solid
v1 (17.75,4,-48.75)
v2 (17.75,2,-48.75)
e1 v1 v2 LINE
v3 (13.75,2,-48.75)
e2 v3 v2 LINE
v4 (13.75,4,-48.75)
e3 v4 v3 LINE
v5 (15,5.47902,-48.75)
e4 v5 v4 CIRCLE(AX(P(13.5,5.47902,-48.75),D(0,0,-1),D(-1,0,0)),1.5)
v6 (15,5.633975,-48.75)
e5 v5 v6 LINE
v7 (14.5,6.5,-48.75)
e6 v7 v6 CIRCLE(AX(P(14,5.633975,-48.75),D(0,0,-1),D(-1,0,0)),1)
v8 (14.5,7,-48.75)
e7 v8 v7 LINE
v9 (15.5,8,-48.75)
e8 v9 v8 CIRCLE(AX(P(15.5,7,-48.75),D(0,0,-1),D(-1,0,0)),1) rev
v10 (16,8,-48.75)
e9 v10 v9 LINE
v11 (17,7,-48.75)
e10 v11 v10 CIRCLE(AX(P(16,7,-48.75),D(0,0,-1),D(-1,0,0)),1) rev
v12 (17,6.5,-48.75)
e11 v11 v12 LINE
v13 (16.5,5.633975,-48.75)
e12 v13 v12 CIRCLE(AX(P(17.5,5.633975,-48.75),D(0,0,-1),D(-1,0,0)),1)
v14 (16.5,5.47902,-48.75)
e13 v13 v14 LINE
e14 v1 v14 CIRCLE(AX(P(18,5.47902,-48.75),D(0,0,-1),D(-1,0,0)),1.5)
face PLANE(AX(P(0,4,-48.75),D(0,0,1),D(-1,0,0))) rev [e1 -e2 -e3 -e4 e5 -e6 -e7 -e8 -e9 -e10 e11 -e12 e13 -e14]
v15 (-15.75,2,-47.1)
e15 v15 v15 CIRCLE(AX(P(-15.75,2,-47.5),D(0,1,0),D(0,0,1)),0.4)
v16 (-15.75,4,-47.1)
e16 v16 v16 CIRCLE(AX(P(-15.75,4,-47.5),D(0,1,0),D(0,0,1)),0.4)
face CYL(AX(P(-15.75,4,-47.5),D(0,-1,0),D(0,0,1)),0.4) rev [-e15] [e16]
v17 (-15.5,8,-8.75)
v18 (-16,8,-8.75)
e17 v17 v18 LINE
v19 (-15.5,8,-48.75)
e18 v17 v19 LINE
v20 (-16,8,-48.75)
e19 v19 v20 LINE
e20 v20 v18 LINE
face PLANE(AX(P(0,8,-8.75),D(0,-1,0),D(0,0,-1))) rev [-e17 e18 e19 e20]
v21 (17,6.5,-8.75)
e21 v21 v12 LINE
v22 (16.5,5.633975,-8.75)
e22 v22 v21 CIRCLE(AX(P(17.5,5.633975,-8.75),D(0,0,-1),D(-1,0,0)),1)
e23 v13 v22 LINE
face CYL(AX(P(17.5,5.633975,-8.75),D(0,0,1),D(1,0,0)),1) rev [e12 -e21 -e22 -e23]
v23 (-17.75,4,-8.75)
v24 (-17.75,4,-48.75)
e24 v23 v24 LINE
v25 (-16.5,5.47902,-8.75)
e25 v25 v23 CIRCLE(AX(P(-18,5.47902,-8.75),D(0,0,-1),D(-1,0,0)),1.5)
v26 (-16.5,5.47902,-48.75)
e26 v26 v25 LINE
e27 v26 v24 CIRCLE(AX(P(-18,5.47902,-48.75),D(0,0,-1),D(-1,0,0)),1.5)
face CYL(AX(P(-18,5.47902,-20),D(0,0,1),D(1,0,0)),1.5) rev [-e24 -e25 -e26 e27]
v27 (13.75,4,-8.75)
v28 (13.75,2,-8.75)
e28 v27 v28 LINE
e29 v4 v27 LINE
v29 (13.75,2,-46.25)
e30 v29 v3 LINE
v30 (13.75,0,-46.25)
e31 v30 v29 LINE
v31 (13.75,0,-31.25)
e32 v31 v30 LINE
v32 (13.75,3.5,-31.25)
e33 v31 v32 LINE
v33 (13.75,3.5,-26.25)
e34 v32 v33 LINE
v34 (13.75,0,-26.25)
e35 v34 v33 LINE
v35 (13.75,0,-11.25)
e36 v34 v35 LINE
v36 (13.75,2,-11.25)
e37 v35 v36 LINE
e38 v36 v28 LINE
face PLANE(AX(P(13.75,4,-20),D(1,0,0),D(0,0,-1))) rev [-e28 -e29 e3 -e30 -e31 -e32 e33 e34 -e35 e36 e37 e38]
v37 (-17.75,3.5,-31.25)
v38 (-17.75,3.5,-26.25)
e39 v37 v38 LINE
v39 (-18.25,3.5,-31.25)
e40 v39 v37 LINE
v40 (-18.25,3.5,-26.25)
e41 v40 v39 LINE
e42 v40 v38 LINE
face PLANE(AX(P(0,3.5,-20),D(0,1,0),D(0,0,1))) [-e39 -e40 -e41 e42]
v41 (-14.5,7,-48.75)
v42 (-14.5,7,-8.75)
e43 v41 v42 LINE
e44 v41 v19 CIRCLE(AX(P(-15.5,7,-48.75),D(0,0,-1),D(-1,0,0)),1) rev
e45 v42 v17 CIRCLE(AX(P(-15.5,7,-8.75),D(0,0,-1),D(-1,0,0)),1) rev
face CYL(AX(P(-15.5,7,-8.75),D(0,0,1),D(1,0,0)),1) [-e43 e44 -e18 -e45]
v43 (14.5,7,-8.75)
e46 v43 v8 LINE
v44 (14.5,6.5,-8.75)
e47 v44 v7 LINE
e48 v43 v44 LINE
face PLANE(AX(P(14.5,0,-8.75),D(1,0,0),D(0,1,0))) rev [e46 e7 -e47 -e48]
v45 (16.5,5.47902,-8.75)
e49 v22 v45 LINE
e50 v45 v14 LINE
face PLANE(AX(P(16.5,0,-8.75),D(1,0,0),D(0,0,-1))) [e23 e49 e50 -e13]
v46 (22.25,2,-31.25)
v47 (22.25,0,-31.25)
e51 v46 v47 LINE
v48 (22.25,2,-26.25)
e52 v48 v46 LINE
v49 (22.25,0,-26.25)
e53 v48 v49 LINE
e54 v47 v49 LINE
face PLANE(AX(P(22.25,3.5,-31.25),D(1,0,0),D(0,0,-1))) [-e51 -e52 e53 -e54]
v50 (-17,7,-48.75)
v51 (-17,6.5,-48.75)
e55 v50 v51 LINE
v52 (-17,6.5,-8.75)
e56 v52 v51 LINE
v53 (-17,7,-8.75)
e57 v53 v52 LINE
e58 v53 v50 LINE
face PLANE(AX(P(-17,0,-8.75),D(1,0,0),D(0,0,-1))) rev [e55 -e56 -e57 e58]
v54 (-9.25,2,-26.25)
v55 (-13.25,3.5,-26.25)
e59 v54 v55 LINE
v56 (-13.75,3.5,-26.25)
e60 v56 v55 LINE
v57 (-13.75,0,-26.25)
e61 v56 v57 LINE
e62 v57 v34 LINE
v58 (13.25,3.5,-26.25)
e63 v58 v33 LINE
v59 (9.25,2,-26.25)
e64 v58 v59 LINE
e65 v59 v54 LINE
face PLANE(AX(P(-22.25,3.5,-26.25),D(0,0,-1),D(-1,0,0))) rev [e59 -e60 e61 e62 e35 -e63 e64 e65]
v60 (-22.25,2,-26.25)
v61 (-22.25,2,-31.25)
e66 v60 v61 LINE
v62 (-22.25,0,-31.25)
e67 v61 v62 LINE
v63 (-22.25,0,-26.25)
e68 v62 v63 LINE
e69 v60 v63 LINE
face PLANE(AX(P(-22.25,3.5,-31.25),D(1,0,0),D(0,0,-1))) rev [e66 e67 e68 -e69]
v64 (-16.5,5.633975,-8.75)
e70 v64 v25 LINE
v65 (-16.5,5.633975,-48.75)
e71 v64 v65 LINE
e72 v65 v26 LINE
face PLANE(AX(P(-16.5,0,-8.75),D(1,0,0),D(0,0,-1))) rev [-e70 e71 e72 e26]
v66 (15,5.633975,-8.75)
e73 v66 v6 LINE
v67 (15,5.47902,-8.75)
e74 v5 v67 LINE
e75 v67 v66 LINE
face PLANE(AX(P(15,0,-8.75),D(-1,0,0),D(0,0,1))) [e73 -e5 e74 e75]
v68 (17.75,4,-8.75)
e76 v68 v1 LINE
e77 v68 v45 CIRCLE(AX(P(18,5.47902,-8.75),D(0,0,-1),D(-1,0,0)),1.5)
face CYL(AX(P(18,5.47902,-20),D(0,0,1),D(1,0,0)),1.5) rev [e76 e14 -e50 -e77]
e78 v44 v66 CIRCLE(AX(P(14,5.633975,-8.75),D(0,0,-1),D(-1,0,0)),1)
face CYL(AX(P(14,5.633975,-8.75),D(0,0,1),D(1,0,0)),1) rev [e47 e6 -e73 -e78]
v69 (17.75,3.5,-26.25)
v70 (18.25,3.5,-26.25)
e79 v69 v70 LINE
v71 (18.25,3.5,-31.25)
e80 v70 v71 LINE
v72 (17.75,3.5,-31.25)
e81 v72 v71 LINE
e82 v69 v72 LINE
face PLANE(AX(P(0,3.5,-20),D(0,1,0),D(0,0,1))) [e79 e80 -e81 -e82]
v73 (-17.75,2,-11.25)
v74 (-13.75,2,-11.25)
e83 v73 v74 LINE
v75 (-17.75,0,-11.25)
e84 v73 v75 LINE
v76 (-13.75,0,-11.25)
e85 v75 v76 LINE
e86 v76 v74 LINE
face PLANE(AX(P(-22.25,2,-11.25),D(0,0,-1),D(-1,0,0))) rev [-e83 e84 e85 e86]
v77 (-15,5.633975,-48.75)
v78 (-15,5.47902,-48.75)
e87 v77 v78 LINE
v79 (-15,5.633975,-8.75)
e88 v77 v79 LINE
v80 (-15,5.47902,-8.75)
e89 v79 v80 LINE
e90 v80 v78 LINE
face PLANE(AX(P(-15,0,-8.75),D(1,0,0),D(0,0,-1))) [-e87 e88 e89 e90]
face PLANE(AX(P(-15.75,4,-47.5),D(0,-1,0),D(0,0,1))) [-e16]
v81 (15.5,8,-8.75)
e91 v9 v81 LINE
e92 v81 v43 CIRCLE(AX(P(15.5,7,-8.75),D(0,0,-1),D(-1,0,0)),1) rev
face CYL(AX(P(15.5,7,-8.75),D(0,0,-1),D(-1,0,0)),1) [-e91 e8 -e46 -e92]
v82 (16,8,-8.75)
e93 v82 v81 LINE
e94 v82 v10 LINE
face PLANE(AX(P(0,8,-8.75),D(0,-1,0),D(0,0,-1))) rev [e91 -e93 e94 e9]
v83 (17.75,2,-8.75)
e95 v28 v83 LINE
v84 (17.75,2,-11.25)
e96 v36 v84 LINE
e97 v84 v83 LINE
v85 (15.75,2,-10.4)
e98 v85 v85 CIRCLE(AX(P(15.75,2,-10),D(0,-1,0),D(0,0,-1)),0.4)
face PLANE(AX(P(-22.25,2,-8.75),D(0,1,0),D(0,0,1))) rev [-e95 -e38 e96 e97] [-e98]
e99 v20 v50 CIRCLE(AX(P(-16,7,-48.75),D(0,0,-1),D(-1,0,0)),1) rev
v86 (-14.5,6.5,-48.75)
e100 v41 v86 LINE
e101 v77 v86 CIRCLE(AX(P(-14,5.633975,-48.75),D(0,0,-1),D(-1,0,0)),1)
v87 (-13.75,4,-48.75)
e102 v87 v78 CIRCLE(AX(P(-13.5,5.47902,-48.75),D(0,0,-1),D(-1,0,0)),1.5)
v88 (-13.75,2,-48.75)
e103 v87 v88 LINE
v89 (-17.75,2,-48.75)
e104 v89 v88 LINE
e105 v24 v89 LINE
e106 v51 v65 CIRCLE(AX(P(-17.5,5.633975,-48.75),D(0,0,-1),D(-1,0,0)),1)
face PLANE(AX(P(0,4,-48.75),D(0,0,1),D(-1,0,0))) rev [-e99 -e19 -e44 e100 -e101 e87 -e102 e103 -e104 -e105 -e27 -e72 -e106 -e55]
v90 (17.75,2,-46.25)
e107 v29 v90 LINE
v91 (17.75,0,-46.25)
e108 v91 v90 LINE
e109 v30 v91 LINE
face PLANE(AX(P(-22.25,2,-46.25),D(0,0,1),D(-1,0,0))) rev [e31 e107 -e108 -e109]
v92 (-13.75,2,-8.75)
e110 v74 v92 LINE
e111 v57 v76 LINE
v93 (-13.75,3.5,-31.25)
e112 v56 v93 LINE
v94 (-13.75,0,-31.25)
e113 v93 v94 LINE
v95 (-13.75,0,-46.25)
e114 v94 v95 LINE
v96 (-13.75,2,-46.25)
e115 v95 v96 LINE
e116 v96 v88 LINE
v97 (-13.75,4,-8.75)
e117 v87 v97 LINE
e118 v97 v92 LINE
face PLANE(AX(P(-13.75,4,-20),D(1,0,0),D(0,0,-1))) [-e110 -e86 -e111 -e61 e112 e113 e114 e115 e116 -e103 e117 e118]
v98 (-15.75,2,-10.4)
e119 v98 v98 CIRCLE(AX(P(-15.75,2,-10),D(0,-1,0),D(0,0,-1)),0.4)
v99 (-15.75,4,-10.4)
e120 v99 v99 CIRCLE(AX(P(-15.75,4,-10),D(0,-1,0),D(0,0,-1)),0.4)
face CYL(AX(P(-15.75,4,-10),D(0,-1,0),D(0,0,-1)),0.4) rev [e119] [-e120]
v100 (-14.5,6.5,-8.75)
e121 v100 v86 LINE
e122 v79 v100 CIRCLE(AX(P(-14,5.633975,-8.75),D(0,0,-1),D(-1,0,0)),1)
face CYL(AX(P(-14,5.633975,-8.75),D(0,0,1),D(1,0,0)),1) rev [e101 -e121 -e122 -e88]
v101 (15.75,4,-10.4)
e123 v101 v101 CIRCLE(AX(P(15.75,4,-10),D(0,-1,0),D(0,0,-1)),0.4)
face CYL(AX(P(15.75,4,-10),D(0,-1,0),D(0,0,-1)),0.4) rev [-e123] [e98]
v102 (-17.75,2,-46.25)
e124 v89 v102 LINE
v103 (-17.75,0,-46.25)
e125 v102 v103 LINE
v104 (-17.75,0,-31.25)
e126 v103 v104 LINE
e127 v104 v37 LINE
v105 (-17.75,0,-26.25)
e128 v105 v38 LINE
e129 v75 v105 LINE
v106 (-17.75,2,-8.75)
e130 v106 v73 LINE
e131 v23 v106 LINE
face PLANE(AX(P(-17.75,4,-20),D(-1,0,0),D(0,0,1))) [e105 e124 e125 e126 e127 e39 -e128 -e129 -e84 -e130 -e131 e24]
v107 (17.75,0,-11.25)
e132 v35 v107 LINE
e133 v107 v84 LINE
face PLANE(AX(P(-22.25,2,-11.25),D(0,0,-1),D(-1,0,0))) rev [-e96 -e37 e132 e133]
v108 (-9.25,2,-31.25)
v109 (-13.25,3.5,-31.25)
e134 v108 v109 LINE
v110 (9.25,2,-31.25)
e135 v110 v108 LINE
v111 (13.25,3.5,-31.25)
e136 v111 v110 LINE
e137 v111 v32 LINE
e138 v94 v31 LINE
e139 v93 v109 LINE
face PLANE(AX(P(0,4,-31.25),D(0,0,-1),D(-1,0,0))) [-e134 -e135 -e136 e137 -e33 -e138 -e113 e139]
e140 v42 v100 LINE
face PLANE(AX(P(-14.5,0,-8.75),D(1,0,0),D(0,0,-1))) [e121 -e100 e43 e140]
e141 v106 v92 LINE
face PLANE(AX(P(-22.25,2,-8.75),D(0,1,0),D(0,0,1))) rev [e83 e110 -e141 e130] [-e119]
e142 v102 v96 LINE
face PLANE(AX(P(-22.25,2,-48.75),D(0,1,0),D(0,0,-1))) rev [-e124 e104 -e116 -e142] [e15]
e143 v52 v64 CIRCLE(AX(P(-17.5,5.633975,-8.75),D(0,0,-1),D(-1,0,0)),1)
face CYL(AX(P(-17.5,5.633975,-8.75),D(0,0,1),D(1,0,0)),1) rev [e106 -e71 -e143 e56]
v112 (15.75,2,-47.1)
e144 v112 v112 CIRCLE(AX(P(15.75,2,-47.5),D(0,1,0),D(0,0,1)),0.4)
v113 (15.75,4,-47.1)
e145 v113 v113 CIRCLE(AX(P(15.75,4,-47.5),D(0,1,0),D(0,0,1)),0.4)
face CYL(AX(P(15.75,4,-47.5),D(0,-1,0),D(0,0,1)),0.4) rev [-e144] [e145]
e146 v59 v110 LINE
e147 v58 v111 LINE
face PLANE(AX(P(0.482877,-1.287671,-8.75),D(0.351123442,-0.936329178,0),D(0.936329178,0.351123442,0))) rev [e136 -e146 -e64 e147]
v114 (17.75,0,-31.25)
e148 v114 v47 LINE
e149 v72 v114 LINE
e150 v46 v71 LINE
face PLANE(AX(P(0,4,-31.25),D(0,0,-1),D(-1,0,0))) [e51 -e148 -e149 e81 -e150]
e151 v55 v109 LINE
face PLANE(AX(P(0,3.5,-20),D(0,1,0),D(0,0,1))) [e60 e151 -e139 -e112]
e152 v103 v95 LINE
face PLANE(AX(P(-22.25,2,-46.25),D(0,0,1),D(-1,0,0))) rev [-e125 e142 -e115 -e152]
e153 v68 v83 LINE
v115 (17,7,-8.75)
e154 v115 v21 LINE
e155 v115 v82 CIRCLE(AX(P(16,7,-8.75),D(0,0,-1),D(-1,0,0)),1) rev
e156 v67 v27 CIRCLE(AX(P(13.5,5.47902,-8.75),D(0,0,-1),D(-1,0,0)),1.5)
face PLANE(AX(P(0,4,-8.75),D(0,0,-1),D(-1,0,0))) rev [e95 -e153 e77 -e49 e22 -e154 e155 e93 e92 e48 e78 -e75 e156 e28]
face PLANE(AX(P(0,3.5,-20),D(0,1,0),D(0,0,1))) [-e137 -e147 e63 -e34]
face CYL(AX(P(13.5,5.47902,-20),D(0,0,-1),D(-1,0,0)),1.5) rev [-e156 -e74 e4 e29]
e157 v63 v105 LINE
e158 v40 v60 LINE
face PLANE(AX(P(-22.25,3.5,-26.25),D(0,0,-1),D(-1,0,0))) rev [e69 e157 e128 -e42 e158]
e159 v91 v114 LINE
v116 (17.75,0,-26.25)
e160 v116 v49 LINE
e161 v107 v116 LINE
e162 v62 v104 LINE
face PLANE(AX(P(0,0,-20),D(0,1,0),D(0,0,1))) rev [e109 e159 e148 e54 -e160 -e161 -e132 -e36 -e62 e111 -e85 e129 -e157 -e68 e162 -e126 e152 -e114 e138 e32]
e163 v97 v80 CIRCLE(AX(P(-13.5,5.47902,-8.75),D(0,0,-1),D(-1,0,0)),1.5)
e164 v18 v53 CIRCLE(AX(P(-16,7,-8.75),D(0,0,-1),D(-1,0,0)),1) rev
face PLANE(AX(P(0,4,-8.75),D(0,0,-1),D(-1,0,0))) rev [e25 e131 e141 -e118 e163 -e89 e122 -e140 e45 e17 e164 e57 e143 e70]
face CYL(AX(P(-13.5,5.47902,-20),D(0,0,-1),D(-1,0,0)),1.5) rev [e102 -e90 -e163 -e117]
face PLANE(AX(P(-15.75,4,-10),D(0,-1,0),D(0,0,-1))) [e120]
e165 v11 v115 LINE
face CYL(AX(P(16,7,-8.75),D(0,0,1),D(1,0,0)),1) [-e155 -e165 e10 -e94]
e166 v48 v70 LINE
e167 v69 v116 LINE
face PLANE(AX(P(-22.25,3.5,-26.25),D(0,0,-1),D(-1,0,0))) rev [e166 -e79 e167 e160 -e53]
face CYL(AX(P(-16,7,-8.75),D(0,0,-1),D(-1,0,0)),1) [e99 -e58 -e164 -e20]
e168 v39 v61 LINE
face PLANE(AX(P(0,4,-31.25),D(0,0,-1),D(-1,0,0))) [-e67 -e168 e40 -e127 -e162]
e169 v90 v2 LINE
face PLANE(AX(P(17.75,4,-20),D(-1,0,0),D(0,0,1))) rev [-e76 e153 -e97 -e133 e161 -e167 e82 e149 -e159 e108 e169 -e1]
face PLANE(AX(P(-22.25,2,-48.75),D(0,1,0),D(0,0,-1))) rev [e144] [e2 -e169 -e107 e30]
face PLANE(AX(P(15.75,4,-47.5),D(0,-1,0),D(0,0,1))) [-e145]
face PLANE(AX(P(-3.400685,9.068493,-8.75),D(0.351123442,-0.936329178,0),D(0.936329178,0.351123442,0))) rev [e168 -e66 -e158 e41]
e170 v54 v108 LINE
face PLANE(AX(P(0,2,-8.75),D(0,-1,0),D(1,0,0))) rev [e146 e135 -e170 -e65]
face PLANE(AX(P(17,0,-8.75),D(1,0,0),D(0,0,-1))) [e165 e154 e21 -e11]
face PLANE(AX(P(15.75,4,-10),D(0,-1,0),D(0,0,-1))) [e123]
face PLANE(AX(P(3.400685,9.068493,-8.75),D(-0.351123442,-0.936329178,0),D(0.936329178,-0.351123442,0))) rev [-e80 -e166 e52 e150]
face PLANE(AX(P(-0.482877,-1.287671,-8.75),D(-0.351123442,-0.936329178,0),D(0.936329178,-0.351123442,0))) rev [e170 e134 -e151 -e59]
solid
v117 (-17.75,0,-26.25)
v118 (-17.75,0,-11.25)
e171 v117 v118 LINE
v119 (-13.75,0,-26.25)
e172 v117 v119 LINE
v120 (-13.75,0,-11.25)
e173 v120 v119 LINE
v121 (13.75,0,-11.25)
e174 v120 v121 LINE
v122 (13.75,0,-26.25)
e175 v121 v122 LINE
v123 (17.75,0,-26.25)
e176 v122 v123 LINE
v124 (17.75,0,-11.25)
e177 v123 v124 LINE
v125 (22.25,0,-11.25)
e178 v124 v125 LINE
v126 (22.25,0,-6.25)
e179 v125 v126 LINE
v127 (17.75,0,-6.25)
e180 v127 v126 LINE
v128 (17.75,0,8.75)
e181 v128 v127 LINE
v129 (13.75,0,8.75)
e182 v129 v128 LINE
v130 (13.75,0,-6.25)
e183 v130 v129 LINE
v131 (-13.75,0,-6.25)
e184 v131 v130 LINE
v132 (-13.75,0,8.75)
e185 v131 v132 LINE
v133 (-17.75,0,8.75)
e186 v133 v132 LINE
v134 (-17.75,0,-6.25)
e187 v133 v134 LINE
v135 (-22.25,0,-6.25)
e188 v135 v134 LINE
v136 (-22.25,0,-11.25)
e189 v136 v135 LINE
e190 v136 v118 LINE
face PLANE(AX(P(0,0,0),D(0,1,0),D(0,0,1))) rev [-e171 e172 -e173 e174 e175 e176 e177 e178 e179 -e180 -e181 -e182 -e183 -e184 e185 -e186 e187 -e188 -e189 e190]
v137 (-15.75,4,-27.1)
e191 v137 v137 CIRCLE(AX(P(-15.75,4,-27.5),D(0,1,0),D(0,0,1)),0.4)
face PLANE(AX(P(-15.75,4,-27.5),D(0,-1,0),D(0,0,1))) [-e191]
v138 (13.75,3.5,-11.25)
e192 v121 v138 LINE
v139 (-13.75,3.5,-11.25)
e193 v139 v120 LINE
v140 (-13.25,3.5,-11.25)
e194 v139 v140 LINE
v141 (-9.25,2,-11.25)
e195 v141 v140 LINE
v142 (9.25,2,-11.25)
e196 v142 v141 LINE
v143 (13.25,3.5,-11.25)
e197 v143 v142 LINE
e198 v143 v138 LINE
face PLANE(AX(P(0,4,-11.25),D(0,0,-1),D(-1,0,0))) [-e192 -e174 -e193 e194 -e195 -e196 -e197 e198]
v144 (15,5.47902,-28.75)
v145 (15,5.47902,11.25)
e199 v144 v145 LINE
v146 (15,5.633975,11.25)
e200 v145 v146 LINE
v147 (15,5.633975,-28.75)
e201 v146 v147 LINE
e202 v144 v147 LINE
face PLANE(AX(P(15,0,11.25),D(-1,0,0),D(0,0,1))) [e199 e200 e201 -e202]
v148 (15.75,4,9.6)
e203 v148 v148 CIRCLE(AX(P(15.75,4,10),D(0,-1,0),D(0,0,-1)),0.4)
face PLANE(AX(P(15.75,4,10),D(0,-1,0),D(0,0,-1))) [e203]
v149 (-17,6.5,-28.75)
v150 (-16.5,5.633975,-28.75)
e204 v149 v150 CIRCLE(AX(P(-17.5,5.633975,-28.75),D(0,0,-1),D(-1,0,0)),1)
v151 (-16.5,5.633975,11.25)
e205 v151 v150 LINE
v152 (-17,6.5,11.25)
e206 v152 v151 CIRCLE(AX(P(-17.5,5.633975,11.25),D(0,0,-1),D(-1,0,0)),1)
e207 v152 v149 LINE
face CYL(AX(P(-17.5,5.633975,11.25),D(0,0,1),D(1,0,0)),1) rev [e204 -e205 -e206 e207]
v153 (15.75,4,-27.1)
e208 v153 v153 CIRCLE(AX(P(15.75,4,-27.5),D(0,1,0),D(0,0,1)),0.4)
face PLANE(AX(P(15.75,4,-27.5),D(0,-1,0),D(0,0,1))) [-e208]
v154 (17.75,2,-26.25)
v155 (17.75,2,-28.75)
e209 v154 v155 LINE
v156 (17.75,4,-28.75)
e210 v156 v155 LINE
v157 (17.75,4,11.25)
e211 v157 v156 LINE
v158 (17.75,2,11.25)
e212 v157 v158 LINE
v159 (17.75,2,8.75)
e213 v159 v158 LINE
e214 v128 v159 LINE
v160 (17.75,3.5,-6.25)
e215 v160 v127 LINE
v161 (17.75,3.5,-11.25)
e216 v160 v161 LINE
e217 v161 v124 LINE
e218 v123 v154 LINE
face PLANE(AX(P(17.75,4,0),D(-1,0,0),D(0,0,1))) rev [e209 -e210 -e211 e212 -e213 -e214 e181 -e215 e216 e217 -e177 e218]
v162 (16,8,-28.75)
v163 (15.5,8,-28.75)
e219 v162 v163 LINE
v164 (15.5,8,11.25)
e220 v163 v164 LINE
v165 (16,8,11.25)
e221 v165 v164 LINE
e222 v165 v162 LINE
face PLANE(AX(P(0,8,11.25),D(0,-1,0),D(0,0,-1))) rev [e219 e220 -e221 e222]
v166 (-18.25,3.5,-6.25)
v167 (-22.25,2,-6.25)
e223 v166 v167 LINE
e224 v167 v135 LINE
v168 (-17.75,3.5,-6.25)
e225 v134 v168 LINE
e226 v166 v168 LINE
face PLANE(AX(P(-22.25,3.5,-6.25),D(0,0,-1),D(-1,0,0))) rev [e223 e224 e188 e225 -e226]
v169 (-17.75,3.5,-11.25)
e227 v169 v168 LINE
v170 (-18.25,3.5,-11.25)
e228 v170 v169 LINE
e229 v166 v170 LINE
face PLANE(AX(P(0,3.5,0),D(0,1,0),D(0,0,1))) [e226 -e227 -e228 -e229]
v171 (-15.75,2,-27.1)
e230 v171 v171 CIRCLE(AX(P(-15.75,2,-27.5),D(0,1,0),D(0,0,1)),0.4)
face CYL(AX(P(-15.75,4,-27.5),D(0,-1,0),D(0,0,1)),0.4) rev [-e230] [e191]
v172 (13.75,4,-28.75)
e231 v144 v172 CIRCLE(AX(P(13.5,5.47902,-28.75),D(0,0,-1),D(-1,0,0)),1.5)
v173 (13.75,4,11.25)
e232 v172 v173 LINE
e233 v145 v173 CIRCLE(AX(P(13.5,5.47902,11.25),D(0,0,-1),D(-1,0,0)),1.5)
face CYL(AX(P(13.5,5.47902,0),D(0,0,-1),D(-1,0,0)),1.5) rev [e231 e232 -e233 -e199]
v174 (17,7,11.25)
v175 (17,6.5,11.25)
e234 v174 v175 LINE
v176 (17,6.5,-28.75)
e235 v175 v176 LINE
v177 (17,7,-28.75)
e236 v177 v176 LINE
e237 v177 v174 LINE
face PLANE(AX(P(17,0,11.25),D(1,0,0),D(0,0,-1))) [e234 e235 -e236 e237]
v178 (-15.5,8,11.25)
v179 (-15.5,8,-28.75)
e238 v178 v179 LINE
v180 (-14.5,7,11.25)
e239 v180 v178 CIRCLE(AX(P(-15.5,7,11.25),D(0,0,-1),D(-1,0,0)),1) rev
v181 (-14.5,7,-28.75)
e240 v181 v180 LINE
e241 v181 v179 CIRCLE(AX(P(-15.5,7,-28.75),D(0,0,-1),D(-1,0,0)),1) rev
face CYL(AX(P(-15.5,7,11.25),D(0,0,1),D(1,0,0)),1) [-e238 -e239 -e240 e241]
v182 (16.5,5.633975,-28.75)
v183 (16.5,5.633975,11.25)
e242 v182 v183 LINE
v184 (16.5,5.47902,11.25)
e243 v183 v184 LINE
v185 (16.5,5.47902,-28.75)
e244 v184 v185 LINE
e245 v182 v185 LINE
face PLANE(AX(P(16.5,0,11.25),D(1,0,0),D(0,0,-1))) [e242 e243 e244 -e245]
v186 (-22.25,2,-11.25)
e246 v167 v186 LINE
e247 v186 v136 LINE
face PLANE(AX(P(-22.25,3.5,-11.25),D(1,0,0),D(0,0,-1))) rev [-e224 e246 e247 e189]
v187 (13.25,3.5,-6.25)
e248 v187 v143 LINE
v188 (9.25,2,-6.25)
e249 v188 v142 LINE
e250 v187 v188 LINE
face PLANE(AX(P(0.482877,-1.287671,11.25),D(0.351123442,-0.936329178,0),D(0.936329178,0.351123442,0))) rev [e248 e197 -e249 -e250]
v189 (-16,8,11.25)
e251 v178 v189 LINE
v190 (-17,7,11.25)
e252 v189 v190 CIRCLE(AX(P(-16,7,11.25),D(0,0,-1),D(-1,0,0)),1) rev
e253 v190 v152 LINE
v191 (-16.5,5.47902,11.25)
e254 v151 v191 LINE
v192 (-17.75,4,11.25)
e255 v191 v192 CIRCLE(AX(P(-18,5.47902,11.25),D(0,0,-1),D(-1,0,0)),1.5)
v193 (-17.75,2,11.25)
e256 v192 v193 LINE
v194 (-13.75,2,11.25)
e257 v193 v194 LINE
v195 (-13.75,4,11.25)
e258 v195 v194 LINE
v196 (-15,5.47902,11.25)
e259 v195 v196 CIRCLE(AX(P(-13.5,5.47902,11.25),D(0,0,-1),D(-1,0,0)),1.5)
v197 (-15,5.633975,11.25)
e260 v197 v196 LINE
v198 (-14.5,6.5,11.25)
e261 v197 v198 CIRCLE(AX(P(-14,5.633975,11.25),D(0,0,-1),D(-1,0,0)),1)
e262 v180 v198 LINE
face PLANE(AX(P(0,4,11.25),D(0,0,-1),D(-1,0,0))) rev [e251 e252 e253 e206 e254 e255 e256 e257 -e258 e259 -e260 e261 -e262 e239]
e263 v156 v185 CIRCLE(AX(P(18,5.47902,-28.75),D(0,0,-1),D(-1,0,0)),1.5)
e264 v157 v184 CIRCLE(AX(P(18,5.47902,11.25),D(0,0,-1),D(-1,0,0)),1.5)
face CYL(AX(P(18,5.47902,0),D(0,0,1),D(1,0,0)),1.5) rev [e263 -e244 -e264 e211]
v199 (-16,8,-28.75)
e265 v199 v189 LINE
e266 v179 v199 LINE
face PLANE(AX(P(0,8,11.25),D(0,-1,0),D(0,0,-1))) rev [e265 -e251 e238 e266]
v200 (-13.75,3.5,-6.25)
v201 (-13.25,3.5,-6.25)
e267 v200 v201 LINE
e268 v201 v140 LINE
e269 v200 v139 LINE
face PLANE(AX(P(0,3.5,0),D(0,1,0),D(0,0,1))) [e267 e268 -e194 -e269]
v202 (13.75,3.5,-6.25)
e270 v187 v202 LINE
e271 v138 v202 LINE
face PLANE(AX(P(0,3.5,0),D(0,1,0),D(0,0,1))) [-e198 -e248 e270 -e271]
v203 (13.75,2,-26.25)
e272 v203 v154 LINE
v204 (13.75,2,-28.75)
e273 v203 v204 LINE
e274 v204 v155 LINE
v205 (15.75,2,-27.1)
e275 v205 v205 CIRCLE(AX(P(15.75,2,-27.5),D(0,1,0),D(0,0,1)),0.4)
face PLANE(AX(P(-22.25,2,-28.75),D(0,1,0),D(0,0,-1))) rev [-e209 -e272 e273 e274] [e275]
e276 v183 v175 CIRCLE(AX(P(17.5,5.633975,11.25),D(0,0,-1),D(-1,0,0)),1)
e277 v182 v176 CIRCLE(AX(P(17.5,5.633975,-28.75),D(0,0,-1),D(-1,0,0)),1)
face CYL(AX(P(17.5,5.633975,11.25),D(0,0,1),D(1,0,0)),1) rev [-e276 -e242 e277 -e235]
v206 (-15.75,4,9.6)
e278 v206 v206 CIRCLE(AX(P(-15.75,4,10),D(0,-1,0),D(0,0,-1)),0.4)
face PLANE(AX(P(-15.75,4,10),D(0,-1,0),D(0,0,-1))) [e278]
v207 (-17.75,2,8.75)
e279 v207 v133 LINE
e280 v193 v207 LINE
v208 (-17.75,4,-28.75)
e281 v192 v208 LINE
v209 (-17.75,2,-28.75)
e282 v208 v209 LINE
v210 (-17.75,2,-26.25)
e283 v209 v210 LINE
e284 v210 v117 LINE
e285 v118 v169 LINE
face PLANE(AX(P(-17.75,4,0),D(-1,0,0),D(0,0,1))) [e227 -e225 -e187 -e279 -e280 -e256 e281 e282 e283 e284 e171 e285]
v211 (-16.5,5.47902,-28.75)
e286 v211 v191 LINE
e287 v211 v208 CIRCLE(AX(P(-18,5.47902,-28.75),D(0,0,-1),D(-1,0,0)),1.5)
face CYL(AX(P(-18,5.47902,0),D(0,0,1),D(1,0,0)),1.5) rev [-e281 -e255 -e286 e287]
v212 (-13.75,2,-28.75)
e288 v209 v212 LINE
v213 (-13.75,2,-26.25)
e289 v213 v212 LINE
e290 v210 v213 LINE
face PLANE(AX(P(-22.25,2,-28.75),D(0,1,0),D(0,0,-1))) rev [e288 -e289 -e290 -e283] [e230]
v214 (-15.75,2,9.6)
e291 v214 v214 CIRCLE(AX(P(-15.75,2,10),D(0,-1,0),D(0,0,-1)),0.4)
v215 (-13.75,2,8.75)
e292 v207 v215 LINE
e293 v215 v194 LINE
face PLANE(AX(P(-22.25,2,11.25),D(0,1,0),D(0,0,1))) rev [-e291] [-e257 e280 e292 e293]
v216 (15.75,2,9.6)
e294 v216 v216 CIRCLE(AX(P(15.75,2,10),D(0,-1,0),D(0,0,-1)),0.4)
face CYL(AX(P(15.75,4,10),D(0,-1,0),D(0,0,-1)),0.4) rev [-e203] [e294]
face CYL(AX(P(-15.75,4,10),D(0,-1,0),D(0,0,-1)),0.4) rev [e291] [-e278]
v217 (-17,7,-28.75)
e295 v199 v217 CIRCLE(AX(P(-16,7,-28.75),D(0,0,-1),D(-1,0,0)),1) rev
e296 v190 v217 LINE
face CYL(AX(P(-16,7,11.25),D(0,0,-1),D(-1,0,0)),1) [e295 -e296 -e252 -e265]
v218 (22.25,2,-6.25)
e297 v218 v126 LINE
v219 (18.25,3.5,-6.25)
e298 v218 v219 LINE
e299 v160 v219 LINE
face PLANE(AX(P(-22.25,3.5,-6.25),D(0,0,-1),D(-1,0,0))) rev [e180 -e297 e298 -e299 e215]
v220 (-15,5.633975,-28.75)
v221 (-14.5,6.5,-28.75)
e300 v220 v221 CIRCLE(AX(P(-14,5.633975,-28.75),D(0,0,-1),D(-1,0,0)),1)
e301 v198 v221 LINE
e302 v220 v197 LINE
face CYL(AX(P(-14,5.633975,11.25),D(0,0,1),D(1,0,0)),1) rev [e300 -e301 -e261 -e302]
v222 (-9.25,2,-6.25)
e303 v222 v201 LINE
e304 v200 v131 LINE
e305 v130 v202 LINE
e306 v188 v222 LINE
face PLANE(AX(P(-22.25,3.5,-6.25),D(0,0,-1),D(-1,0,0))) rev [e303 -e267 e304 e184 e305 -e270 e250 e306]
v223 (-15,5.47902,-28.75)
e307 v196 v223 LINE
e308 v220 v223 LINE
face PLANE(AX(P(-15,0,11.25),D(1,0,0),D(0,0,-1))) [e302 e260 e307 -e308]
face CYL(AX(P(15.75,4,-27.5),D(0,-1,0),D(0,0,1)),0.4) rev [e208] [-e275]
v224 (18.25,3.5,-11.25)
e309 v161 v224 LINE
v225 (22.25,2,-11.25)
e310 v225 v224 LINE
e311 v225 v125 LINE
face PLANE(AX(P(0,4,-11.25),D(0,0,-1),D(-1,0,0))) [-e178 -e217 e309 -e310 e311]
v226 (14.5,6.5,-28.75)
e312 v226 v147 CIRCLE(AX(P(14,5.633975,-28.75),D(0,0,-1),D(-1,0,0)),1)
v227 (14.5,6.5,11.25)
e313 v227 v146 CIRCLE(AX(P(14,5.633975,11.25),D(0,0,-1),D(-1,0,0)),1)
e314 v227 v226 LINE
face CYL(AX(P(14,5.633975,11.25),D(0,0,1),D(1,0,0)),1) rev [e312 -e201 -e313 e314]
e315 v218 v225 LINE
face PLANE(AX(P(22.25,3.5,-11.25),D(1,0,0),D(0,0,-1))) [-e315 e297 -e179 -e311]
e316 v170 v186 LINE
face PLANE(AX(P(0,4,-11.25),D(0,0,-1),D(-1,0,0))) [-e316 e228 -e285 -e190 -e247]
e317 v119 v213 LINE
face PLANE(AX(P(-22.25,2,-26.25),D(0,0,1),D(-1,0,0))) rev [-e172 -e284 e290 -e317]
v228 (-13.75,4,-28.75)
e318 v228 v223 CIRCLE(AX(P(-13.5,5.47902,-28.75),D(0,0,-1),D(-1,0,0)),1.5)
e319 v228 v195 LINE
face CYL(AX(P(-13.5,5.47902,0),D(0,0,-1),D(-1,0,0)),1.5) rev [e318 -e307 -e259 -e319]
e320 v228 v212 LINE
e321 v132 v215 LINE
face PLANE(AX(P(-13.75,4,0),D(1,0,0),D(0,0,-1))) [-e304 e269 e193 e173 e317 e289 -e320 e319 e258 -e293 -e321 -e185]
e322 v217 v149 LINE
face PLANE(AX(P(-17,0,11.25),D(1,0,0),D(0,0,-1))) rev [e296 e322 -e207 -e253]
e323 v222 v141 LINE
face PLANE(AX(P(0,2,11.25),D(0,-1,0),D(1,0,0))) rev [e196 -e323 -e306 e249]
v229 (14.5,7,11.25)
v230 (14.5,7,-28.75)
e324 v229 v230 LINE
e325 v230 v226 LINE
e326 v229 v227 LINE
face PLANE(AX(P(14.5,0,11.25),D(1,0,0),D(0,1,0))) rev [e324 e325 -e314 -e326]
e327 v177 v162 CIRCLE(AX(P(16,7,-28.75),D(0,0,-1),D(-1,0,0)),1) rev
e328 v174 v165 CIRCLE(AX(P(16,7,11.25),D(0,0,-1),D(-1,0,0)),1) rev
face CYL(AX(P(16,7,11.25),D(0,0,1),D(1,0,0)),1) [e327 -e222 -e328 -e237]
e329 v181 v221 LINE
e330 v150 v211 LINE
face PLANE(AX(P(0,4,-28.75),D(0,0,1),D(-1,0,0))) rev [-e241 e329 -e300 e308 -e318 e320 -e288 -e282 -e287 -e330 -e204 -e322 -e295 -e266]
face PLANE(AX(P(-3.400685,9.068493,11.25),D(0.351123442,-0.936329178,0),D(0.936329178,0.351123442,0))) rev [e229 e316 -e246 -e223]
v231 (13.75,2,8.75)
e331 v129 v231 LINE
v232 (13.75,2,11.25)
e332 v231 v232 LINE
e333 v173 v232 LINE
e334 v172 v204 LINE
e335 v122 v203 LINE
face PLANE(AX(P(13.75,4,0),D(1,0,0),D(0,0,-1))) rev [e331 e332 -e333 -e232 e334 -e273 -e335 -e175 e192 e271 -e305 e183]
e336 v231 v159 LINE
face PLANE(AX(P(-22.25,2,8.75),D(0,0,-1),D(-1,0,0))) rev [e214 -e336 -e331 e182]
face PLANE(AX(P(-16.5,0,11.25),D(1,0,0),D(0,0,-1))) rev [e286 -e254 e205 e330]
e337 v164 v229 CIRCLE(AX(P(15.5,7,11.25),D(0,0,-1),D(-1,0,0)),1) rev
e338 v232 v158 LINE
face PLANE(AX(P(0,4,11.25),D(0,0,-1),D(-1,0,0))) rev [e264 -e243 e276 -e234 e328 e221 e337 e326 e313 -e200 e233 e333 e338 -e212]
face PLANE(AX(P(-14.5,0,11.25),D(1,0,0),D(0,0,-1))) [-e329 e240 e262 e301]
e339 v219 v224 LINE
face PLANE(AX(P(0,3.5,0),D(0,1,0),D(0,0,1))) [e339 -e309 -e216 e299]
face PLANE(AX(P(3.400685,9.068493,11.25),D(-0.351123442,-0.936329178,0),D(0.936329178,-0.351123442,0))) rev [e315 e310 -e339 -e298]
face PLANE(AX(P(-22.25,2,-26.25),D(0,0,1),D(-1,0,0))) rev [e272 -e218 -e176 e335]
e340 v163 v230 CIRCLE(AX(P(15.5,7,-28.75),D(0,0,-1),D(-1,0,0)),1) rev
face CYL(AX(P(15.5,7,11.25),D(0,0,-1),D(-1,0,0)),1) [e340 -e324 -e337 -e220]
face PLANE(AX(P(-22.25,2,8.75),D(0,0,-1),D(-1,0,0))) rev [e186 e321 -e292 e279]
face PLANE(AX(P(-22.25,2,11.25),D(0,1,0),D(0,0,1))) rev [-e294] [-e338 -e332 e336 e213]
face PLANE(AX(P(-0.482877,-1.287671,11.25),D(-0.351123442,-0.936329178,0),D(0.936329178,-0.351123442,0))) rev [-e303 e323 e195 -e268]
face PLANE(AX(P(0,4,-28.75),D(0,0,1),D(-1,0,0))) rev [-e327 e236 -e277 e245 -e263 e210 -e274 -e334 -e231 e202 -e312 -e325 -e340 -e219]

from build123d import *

# Parameters (mm, degrees)
SKETCH_1_W             = 4
SKETCH_1_H             = 17.5
SKETCH_1_H_2           = 5
EXTRUDE_1_DEPTH        = 4
SKETCH_1_7_W           = 44.5
SKETCH_1_7_H           = 5
EXTRUDE_2_DEPTH        = 3.5
SKETCH_2_W             = 18.5
SKETCH_2_H             = 1.5
CUT_EXTRUDE_1_DEPTH    = 32.89533665
SKETCH_2_3_W           = 2.5
SKETCH_2_3_H           = 1.5
EXTRUDE_4_DEPTH        = 22.5
FILLET_1_R             = 1
FILLET_2_R             = 1.5
FILLET_3_R             = 1
SKETCH_5_W             = 2.5
SKETCH_5_H             = 2
CUT_EXTRUDE_2_DEPTH    = 43.315038698
SKETCH_10_R            = 0.4
CUT_EXTRUDE_3_DEPTH    = 2
PATTERN_LINEAR_2_COUNT = 2
PATTERN_LINEAR_2_PITCH = 20


with BuildPart() as part:
    # 草图1 → 凸台-拉伸1 (new body)
    with BuildSketch(Plane(origin=(0, 0, 0), x_dir=(1, 0, 0), z_dir=(0, 1, 0))):
        with Locations((-15.75, -2.5)):
            Rectangle(SKETCH_1_W, SKETCH_1_H)
        with Locations((15.75, -2.5)):
            Rectangle(SKETCH_1_W, SKETCH_1_H)
        with Locations((15.75, 8.75)):
            Rectangle(SKETCH_1_W, SKETCH_1_H_2)
        with Locations((-15.75, 8.75)):
            Rectangle(SKETCH_1_W, SKETCH_1_H_2)
    extrude(amount=EXTRUDE_1_DEPTH)

    # 草图1<7> → 凸台-拉伸2 (add)
    with BuildSketch(Plane(origin=(0, 0, 0), x_dir=(1, 0, 0), z_dir=(0, 1, 0))):
        with Locations((0, 8.75)):
            Rectangle(SKETCH_1_7_W, SKETCH_1_7_H)
    extrude(amount=EXTRUDE_2_DEPTH)

    # 草图2 → 切除-拉伸1 (cut, through all)
    with BuildSketch(Plane(origin=(0, 0, -11.25), x_dir=(-1, 0, 0), z_dir=(0, 0, -1))):
        with Locations((0, 2.75)):
            Rectangle(SKETCH_2_W, SKETCH_2_H)
        Polygon((13.25, 3.5), (9.25, 3.5), (9.25, 2), align=None)
        Polygon((-9.25, 3.5), (-13.25, 3.5), (-9.25, 2), align=None)
        Polygon((-22.25, 3.5), (-22.25, 2), (-18.25, 3.5), align=None)
        Polygon((22.25, 3.5), (18.25, 3.5), (22.25, 2), align=None)
    extrude(amount=-CUT_EXTRUDE_1_DEPTH, mode=Mode.SUBTRACT)

    # 草图2<3> → 凸台-拉伸4 (add, through all)
    with BuildSketch(Plane(origin=(0, 0, -11.25), x_dir=(-1, 0, 0), z_dir=(0, 0, -1))):
        with Locations((-15.75, 7.25)):
            Rectangle(SKETCH_2_3_W, SKETCH_2_3_H)
        Polygon((-15, 6.5), (-16.5, 6.5), (-16.5, 4), (-15.75, 4), (-15, 4), align=None)
        with Locations((15.75, 7.25)):
            Rectangle(SKETCH_2_3_W, SKETCH_2_3_H)
        Polygon((16.5, 6.5), (15, 6.5), (15, 4), (15.75, 4), (16.5, 4), align=None)
    extrude(amount=-EXTRUDE_4_DEPTH)

    # 圆角1
    # the kernel refuses this fillet: 1 mm, written as the material it adds along each edge
    with BuildSketch(Plane(origin=(-16.5, 6.5, -11.25), x_dir=(0, -1, 0), z_dir=(0, 0, 1))) as fillet_1_piece_1:
        with BuildLine():
            CenterArc((0.866025404, -1), FILLET_1_R, 90, 60)
            Line((0, -0.5), (-0.017320508, -0.49))
            ThreePointArc((-0.017320508, -0.49), (-0.02, -0.25), (-0.02, 0))
            Line((-0.02, 0), (0, 0.02))
            Line((0, 0.02), (0.866025404, 0.02))
            Line((0.866025404, 0.02), (0.866025404, 0))
        make_face()
    extrude(amount=22.5)
    with BuildSketch(Plane(origin=(-15, 6.5, -11.25), x_dir=(0, -1, 0), z_dir=(0, 0, 1)), Plane(origin=(16.5, 6.5, -11.25), x_dir=(0, -1, 0), z_dir=(0, 0, 1))) as fillet_1_piece_2:
        with BuildLine():
            CenterArc((0.866025404, 1), FILLET_1_R, 210, 60)
            Line((0, 0.5), (-0.017320508, 0.49))
            ThreePointArc((-0.017320508, 0.49), (-0.02, 0.25), (-0.02, 0))
            Line((-0.02, 0), (0, -0.02))
            Line((0, -0.02), (0.866025404, -0.02))
            Line((0.866025404, -0.02), (0.866025404, 0))
        make_face()
    extrude(amount=22.5)
    with BuildSketch(Plane(origin=(15, 6.5, -11.25), x_dir=(-1, 0, 0), z_dir=(0, 0, 1))) as fillet_1_piece_3:
        with BuildLine():
            CenterArc((1, 0.866025404), FILLET_1_R, 180, 60)
            Line((0, 0.866025404), (-0.02, 0.866025404))
            Line((-0.02, 0.866025404), (-0.02, 0))
            Line((-0.02, 0), (0, -0.02))
            ThreePointArc((0, -0.02), (0.25, -0.02), (0.49, -0.017320508))
            Line((0.49, -0.017320508), (0.5, 0))
        make_face()
    extrude(amount=22.5)

    # 圆角2
    # the kernel refuses this fillet: 1.5 mm, written as the material it adds along each edge
    with BuildSketch(Plane(origin=(16.5, 4, -11.25), x_dir=(1, 0, 0), z_dir=(0, 0, 1)), Plane(origin=(-15, 4, -11.25), x_dir=(1, 0, 0), z_dir=(0, 0, 1))) as fillet_2_piece_1:
        with BuildLine():
            CenterArc((1.5, 1.479019946), FILLET_2_R, 180, 80.405931773)
            Line((0, 1.479019946), (-0.03, 1.479019946))
            Line((-0.03, 1.479019946), (-0.03, 0))
            Line((-0.03, 0), (0, -0.03))
            ThreePointArc((0, -0.03), (0.625, -0.03), (1.245, -0.029580399))
            Line((1.245, -0.029580399), (1.25, 0))
        make_face()
    extrude(amount=22.5)
    with BuildSketch(Plane(origin=(15, 4, -11.25), x_dir=(0, 1, 0), z_dir=(0, 0, 1)), Plane(origin=(-16.5, 4, -11.25), x_dir=(0, 1, 0), z_dir=(0, 0, 1))) as fillet_2_piece_2:
        with BuildLine():
            CenterArc((1.479019946, 1.5), FILLET_2_R, 189.594068227, 80.405931773)
            Line((0, 1.25), (-0.029580399, 1.245))
            ThreePointArc((-0.029580399, 1.245), (-0.03, 0.625), (-0.03, 0))
            Line((-0.03, 0), (0, -0.03))
            Line((0, -0.03), (1.479019946, -0.03))
            Line((1.479019946, -0.03), (1.479019946, 0))
        make_face()
    extrude(amount=22.5)

    # 圆角3
    fillet_3_edges = [part.edges().sort_by_distance(p)[0] for p in [
        (14.5, 8, 0),
        (17, 8, 0),
        (-17, 8, 0),
        (-14.5, 8, 0),
    ]]
    fillet(fillet_3_edges, radius=FILLET_3_R)

    # 草图5 → 切除-拉伸2 (cut, through all)
    with BuildSketch(Plane(origin=(17.75, 0, 0), x_dir=(0, 0, -1), z_dir=(1, 0, 0))):
        with Locations((-10, 1)):
            Rectangle(SKETCH_5_W, SKETCH_5_H)
    extrude(amount=-CUT_EXTRUDE_2_DEPTH, mode=Mode.SUBTRACT)

    # 草图10 → 切除-拉伸3 (cut)
    with BuildSketch(Plane.XZ.offset(-2)):
        with Locations(Location((15.75, 10, 0), (0, 0, 270))):
            Circle(SKETCH_10_R)
        with Locations(Location((-15.75, 10, 0), (0, 0, 270))):
            Circle(SKETCH_10_R)
    extrude(amount=-CUT_EXTRUDE_3_DEPTH, mode=Mode.SUBTRACT)

    # 镜向1: part across plane


with BuildPart() as part_1:
    add(part.part)
    add(part.part.mirror(Plane(origin=(0, 0, -8.75), x_dir=(1, 0, 0), z_dir=(0, 0, -1))))


with BuildPart() as pattern_linear_2_1:
    # 阵列(线性)2: pattern copy
    add(part_1.part.moved(Location(Vector(0, 0, -1) * (1 * PATTERN_LINEAR_2_PITCH))))


solid = Compound([part_1.part, pattern_linear_2_1.part])
